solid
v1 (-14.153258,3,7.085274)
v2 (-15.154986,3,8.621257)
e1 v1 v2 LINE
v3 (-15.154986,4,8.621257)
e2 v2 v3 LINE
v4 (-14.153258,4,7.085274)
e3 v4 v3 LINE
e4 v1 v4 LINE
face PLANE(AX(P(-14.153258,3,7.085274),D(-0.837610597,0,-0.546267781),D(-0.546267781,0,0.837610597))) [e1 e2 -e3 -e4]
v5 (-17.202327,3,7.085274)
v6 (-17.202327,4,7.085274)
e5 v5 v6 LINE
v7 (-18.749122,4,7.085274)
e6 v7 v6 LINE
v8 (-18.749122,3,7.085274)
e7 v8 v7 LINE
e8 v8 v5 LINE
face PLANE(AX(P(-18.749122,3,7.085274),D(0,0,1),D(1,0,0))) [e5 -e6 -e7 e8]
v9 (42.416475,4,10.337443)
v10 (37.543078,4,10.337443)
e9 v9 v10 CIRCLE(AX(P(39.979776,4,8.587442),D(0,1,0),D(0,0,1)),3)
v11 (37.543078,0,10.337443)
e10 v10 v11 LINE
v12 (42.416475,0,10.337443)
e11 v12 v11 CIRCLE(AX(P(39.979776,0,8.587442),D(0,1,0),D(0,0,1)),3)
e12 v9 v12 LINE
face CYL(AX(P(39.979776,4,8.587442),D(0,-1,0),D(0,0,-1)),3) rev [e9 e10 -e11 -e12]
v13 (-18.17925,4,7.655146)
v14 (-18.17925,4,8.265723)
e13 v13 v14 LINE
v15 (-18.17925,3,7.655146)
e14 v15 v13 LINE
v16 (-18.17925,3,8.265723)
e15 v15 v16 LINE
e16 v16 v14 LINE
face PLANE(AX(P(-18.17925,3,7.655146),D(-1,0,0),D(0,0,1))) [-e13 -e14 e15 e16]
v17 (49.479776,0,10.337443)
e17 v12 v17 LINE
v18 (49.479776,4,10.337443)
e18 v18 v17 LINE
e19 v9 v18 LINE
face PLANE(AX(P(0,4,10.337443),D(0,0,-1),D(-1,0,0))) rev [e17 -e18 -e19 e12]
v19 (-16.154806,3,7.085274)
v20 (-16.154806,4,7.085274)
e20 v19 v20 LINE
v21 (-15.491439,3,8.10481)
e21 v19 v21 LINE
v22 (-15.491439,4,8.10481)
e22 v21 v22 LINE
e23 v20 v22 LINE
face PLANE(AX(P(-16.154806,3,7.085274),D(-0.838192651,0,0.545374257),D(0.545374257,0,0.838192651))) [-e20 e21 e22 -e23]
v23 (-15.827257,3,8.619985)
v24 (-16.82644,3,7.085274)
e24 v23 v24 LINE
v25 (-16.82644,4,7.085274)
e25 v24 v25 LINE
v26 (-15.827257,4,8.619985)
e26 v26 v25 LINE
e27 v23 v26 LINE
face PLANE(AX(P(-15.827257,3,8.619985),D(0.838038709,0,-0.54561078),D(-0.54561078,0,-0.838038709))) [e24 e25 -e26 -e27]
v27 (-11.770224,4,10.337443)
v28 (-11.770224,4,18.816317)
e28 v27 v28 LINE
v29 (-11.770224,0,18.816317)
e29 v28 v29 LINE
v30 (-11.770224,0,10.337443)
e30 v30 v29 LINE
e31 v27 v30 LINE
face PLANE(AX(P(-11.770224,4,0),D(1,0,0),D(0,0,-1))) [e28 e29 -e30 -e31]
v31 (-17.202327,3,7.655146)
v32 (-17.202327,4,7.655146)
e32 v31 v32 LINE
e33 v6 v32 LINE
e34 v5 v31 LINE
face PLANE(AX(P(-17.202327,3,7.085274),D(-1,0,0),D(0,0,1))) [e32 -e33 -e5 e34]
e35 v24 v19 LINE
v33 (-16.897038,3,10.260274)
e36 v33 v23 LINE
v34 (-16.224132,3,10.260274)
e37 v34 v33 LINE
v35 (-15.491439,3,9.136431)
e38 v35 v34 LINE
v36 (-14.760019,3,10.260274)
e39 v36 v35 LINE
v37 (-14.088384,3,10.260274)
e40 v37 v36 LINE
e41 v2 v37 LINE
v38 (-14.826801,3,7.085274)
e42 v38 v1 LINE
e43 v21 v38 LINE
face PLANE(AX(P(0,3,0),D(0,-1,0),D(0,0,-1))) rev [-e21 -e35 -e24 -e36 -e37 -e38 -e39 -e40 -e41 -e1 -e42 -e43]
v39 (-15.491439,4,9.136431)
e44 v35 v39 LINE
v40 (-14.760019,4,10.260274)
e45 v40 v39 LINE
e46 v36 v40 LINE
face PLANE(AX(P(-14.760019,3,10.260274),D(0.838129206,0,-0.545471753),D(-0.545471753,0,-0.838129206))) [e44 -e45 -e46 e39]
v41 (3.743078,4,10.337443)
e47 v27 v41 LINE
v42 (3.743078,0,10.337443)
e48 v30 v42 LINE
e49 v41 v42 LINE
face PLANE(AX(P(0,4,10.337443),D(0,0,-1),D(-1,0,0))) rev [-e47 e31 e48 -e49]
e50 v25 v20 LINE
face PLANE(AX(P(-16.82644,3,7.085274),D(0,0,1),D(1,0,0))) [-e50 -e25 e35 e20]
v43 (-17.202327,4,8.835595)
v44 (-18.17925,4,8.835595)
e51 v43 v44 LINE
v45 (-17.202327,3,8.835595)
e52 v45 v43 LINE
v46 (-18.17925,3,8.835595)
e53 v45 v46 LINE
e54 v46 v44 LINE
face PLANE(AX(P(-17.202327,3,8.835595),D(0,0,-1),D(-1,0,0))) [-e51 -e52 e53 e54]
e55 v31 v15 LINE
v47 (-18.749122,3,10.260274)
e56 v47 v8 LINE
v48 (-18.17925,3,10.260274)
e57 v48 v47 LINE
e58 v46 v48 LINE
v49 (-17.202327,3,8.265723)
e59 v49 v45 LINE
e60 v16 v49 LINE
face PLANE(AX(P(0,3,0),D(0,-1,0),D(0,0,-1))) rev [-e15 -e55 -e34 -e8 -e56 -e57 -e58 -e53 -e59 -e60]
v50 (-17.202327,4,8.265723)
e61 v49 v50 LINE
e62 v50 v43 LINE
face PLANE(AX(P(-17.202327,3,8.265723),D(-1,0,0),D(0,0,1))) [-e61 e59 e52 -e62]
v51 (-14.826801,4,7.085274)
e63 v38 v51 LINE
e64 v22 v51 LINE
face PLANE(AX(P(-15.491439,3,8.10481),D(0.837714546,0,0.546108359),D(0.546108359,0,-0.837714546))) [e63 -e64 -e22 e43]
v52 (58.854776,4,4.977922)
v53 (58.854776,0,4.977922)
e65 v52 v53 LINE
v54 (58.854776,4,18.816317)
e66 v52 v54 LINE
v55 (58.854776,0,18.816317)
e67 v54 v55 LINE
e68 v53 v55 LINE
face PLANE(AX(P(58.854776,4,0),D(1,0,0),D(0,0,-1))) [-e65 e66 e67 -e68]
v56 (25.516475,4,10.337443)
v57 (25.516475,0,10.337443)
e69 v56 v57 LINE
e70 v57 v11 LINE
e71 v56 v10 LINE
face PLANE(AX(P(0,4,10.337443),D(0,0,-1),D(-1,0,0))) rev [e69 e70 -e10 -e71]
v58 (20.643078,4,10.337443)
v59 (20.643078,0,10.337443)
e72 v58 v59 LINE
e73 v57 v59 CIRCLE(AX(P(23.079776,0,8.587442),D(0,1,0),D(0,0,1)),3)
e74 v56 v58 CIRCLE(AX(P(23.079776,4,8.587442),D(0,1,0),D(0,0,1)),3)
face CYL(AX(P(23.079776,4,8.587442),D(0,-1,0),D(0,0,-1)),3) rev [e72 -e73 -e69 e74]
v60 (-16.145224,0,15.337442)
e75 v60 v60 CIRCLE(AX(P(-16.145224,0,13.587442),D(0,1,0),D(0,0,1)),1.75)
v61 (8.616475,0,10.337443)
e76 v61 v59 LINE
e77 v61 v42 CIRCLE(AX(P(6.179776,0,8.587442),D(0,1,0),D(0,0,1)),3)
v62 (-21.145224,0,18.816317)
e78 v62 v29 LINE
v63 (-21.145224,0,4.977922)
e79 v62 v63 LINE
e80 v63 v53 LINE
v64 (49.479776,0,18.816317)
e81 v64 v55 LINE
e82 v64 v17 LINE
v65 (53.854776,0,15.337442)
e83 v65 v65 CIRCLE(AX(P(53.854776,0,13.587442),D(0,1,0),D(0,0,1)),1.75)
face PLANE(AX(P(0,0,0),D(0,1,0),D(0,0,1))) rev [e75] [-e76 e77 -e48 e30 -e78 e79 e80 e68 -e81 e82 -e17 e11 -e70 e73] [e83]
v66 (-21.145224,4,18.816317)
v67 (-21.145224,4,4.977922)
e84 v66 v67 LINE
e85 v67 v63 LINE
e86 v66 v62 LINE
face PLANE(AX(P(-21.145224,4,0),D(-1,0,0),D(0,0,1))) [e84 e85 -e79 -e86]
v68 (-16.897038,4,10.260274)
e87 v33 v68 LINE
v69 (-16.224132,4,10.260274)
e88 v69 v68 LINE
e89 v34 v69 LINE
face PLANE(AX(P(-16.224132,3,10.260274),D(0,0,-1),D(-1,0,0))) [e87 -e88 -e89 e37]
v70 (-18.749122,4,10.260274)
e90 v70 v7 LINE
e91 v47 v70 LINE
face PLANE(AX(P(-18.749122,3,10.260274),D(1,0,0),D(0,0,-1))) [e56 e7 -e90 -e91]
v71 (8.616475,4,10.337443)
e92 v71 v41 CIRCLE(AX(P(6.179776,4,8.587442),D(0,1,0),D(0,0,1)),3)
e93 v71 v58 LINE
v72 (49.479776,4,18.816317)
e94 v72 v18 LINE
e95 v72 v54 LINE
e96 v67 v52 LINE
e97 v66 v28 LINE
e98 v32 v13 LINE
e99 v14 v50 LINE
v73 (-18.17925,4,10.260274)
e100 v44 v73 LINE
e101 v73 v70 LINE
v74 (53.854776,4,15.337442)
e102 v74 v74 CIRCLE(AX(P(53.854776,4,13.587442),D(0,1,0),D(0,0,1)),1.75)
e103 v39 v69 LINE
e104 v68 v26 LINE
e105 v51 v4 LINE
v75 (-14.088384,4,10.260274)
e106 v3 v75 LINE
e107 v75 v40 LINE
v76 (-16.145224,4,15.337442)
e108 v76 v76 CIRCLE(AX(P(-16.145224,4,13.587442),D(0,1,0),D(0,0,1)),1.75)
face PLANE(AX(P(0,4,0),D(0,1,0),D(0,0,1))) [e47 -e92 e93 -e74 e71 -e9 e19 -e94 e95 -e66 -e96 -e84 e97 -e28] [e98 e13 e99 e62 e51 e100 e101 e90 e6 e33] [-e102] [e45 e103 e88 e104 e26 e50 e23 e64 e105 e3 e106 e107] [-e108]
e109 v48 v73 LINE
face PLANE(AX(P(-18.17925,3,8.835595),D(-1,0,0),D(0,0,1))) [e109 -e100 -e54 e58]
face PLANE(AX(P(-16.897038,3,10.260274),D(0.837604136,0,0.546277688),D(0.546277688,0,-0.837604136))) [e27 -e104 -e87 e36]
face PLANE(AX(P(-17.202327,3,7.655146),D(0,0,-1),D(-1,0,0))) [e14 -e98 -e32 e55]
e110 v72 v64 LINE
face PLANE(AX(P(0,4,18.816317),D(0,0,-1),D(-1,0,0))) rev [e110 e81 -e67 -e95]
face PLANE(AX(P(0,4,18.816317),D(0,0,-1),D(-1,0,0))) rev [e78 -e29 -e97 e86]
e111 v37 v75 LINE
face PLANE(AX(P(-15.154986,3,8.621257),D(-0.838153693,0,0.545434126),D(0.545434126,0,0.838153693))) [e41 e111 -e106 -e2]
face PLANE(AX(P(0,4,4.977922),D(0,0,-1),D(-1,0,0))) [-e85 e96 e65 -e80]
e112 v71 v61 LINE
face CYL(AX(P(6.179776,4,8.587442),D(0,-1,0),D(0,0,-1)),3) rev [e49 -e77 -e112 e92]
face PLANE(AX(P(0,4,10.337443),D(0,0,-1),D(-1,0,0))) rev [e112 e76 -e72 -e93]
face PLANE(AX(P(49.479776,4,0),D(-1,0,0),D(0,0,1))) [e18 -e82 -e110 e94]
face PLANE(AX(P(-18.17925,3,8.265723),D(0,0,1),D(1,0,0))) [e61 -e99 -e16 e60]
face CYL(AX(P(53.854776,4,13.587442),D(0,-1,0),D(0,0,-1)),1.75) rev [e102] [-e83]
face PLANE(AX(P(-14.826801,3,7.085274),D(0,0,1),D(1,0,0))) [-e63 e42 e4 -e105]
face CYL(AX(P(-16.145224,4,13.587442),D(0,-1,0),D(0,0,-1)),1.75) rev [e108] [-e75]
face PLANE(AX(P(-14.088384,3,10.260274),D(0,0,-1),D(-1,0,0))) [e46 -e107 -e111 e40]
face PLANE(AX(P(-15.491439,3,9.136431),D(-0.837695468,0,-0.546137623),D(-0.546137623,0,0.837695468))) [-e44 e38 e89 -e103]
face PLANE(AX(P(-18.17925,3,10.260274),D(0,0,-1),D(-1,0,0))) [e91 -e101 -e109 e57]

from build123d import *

# Parameters (mm, degrees)
BOSS_EXTRUDE1_OUTLINE_R = 1.75
BOSS_EXTRUDE1_DEPTH     = 4
CUT_EXTRUDE1_DEPTH      = 1


# Read off the part's stored shape, not the designer's step: Boss-Extrude1
with BuildPart() as part:
    # Boss-Extrude1 outline → Boss-Extrude1 (new body)
    with BuildSketch(Plane(origin=(0, 0, 0), x_dir=(1, 0, 0), z_dir=(0, 1, 0))):
        with BuildLine():
            Line((25.516474615, -10.33744254), (37.54307775, -10.33744254))
            ThreePointArc((37.54307775, -10.33744254), (39.979776182, -5.587442326), (42.416474615, -10.33744254))
            Line((42.416474615, -10.33744254), (49.479776182, -10.33744254))
            Line((49.479776182, -10.33744254), (49.479776182, -18.81631662))
            Line((49.479776182, -18.81631662), (58.854776182, -18.81631662))
            Line((58.854776182, -18.81631662), (58.854776182, -4.977921711))
            Line((58.854776182, -4.977921711), (-21.145223818, -4.977921711))
            Line((-21.145223818, -4.977921711), (-21.145223818, -18.81631662))
            Line((-21.145223818, -18.81631662), (-11.770223818, -18.81631662))
            Line((-11.770223818, -18.81631662), (-11.770223818, -10.33744254))
            Line((-11.770223818, -10.33744254), (3.74307775, -10.33744254))
            ThreePointArc((3.74307775, -10.33744254), (6.179776182, -5.587442326), (8.616474615, -10.33744254))
            Line((8.616474615, -10.33744254), (20.64307775, -10.33744254))
            ThreePointArc((20.64307775, -10.33744254), (23.079776182, -5.587442326), (25.516474615, -10.33744254))
        make_face()
        with Locations((-16.145223818, -13.587442433)):
            Circle(BOSS_EXTRUDE1_OUTLINE_R, mode=Mode.SUBTRACT)
        with Locations((53.854776182, -13.587442433)):
            Circle(BOSS_EXTRUDE1_OUTLINE_R, mode=Mode.SUBTRACT)
    extrude(amount=BOSS_EXTRUDE1_DEPTH)

    # Sketch2 → Cut-Extrude1 (cut)
    with BuildSketch(Plane(origin=(0, 4, 0), x_dir=(1, 0, 0), z_dir=(0, 1, 0))):
        Polygon((-18.749121586, -7.085274104), (-17.202326714, -7.085274104), (-17.202326714, -7.655145899), (-18.179249791, -7.655145899), (-18.179249791, -8.265722822), (-17.202326714, -8.265722822), (-17.202326714, -8.835594617), (-18.179249791, -8.835594617), (-18.179249791, -10.260274104), (-18.749121586, -10.260274104), align=None)
        Polygon((-16.826440296, -7.085274104), (-16.15480568, -7.085274104), (-15.491439294, -8.104810362), (-14.826800873, -7.085274104), (-14.153258204, -7.085274104), (-15.154985969, -8.621256676), (-14.088384406, -10.260274104), (-14.760019022, -10.260274104), (-15.491439294, -9.136430955), (-16.224131602, -10.260274104), (-16.897038253, -10.260274104), (-15.827256602, -8.619984641), align=None)
    extrude(amount=-CUT_EXTRUDE1_DEPTH, mode=Mode.SUBTRACT)


solid = part.part
